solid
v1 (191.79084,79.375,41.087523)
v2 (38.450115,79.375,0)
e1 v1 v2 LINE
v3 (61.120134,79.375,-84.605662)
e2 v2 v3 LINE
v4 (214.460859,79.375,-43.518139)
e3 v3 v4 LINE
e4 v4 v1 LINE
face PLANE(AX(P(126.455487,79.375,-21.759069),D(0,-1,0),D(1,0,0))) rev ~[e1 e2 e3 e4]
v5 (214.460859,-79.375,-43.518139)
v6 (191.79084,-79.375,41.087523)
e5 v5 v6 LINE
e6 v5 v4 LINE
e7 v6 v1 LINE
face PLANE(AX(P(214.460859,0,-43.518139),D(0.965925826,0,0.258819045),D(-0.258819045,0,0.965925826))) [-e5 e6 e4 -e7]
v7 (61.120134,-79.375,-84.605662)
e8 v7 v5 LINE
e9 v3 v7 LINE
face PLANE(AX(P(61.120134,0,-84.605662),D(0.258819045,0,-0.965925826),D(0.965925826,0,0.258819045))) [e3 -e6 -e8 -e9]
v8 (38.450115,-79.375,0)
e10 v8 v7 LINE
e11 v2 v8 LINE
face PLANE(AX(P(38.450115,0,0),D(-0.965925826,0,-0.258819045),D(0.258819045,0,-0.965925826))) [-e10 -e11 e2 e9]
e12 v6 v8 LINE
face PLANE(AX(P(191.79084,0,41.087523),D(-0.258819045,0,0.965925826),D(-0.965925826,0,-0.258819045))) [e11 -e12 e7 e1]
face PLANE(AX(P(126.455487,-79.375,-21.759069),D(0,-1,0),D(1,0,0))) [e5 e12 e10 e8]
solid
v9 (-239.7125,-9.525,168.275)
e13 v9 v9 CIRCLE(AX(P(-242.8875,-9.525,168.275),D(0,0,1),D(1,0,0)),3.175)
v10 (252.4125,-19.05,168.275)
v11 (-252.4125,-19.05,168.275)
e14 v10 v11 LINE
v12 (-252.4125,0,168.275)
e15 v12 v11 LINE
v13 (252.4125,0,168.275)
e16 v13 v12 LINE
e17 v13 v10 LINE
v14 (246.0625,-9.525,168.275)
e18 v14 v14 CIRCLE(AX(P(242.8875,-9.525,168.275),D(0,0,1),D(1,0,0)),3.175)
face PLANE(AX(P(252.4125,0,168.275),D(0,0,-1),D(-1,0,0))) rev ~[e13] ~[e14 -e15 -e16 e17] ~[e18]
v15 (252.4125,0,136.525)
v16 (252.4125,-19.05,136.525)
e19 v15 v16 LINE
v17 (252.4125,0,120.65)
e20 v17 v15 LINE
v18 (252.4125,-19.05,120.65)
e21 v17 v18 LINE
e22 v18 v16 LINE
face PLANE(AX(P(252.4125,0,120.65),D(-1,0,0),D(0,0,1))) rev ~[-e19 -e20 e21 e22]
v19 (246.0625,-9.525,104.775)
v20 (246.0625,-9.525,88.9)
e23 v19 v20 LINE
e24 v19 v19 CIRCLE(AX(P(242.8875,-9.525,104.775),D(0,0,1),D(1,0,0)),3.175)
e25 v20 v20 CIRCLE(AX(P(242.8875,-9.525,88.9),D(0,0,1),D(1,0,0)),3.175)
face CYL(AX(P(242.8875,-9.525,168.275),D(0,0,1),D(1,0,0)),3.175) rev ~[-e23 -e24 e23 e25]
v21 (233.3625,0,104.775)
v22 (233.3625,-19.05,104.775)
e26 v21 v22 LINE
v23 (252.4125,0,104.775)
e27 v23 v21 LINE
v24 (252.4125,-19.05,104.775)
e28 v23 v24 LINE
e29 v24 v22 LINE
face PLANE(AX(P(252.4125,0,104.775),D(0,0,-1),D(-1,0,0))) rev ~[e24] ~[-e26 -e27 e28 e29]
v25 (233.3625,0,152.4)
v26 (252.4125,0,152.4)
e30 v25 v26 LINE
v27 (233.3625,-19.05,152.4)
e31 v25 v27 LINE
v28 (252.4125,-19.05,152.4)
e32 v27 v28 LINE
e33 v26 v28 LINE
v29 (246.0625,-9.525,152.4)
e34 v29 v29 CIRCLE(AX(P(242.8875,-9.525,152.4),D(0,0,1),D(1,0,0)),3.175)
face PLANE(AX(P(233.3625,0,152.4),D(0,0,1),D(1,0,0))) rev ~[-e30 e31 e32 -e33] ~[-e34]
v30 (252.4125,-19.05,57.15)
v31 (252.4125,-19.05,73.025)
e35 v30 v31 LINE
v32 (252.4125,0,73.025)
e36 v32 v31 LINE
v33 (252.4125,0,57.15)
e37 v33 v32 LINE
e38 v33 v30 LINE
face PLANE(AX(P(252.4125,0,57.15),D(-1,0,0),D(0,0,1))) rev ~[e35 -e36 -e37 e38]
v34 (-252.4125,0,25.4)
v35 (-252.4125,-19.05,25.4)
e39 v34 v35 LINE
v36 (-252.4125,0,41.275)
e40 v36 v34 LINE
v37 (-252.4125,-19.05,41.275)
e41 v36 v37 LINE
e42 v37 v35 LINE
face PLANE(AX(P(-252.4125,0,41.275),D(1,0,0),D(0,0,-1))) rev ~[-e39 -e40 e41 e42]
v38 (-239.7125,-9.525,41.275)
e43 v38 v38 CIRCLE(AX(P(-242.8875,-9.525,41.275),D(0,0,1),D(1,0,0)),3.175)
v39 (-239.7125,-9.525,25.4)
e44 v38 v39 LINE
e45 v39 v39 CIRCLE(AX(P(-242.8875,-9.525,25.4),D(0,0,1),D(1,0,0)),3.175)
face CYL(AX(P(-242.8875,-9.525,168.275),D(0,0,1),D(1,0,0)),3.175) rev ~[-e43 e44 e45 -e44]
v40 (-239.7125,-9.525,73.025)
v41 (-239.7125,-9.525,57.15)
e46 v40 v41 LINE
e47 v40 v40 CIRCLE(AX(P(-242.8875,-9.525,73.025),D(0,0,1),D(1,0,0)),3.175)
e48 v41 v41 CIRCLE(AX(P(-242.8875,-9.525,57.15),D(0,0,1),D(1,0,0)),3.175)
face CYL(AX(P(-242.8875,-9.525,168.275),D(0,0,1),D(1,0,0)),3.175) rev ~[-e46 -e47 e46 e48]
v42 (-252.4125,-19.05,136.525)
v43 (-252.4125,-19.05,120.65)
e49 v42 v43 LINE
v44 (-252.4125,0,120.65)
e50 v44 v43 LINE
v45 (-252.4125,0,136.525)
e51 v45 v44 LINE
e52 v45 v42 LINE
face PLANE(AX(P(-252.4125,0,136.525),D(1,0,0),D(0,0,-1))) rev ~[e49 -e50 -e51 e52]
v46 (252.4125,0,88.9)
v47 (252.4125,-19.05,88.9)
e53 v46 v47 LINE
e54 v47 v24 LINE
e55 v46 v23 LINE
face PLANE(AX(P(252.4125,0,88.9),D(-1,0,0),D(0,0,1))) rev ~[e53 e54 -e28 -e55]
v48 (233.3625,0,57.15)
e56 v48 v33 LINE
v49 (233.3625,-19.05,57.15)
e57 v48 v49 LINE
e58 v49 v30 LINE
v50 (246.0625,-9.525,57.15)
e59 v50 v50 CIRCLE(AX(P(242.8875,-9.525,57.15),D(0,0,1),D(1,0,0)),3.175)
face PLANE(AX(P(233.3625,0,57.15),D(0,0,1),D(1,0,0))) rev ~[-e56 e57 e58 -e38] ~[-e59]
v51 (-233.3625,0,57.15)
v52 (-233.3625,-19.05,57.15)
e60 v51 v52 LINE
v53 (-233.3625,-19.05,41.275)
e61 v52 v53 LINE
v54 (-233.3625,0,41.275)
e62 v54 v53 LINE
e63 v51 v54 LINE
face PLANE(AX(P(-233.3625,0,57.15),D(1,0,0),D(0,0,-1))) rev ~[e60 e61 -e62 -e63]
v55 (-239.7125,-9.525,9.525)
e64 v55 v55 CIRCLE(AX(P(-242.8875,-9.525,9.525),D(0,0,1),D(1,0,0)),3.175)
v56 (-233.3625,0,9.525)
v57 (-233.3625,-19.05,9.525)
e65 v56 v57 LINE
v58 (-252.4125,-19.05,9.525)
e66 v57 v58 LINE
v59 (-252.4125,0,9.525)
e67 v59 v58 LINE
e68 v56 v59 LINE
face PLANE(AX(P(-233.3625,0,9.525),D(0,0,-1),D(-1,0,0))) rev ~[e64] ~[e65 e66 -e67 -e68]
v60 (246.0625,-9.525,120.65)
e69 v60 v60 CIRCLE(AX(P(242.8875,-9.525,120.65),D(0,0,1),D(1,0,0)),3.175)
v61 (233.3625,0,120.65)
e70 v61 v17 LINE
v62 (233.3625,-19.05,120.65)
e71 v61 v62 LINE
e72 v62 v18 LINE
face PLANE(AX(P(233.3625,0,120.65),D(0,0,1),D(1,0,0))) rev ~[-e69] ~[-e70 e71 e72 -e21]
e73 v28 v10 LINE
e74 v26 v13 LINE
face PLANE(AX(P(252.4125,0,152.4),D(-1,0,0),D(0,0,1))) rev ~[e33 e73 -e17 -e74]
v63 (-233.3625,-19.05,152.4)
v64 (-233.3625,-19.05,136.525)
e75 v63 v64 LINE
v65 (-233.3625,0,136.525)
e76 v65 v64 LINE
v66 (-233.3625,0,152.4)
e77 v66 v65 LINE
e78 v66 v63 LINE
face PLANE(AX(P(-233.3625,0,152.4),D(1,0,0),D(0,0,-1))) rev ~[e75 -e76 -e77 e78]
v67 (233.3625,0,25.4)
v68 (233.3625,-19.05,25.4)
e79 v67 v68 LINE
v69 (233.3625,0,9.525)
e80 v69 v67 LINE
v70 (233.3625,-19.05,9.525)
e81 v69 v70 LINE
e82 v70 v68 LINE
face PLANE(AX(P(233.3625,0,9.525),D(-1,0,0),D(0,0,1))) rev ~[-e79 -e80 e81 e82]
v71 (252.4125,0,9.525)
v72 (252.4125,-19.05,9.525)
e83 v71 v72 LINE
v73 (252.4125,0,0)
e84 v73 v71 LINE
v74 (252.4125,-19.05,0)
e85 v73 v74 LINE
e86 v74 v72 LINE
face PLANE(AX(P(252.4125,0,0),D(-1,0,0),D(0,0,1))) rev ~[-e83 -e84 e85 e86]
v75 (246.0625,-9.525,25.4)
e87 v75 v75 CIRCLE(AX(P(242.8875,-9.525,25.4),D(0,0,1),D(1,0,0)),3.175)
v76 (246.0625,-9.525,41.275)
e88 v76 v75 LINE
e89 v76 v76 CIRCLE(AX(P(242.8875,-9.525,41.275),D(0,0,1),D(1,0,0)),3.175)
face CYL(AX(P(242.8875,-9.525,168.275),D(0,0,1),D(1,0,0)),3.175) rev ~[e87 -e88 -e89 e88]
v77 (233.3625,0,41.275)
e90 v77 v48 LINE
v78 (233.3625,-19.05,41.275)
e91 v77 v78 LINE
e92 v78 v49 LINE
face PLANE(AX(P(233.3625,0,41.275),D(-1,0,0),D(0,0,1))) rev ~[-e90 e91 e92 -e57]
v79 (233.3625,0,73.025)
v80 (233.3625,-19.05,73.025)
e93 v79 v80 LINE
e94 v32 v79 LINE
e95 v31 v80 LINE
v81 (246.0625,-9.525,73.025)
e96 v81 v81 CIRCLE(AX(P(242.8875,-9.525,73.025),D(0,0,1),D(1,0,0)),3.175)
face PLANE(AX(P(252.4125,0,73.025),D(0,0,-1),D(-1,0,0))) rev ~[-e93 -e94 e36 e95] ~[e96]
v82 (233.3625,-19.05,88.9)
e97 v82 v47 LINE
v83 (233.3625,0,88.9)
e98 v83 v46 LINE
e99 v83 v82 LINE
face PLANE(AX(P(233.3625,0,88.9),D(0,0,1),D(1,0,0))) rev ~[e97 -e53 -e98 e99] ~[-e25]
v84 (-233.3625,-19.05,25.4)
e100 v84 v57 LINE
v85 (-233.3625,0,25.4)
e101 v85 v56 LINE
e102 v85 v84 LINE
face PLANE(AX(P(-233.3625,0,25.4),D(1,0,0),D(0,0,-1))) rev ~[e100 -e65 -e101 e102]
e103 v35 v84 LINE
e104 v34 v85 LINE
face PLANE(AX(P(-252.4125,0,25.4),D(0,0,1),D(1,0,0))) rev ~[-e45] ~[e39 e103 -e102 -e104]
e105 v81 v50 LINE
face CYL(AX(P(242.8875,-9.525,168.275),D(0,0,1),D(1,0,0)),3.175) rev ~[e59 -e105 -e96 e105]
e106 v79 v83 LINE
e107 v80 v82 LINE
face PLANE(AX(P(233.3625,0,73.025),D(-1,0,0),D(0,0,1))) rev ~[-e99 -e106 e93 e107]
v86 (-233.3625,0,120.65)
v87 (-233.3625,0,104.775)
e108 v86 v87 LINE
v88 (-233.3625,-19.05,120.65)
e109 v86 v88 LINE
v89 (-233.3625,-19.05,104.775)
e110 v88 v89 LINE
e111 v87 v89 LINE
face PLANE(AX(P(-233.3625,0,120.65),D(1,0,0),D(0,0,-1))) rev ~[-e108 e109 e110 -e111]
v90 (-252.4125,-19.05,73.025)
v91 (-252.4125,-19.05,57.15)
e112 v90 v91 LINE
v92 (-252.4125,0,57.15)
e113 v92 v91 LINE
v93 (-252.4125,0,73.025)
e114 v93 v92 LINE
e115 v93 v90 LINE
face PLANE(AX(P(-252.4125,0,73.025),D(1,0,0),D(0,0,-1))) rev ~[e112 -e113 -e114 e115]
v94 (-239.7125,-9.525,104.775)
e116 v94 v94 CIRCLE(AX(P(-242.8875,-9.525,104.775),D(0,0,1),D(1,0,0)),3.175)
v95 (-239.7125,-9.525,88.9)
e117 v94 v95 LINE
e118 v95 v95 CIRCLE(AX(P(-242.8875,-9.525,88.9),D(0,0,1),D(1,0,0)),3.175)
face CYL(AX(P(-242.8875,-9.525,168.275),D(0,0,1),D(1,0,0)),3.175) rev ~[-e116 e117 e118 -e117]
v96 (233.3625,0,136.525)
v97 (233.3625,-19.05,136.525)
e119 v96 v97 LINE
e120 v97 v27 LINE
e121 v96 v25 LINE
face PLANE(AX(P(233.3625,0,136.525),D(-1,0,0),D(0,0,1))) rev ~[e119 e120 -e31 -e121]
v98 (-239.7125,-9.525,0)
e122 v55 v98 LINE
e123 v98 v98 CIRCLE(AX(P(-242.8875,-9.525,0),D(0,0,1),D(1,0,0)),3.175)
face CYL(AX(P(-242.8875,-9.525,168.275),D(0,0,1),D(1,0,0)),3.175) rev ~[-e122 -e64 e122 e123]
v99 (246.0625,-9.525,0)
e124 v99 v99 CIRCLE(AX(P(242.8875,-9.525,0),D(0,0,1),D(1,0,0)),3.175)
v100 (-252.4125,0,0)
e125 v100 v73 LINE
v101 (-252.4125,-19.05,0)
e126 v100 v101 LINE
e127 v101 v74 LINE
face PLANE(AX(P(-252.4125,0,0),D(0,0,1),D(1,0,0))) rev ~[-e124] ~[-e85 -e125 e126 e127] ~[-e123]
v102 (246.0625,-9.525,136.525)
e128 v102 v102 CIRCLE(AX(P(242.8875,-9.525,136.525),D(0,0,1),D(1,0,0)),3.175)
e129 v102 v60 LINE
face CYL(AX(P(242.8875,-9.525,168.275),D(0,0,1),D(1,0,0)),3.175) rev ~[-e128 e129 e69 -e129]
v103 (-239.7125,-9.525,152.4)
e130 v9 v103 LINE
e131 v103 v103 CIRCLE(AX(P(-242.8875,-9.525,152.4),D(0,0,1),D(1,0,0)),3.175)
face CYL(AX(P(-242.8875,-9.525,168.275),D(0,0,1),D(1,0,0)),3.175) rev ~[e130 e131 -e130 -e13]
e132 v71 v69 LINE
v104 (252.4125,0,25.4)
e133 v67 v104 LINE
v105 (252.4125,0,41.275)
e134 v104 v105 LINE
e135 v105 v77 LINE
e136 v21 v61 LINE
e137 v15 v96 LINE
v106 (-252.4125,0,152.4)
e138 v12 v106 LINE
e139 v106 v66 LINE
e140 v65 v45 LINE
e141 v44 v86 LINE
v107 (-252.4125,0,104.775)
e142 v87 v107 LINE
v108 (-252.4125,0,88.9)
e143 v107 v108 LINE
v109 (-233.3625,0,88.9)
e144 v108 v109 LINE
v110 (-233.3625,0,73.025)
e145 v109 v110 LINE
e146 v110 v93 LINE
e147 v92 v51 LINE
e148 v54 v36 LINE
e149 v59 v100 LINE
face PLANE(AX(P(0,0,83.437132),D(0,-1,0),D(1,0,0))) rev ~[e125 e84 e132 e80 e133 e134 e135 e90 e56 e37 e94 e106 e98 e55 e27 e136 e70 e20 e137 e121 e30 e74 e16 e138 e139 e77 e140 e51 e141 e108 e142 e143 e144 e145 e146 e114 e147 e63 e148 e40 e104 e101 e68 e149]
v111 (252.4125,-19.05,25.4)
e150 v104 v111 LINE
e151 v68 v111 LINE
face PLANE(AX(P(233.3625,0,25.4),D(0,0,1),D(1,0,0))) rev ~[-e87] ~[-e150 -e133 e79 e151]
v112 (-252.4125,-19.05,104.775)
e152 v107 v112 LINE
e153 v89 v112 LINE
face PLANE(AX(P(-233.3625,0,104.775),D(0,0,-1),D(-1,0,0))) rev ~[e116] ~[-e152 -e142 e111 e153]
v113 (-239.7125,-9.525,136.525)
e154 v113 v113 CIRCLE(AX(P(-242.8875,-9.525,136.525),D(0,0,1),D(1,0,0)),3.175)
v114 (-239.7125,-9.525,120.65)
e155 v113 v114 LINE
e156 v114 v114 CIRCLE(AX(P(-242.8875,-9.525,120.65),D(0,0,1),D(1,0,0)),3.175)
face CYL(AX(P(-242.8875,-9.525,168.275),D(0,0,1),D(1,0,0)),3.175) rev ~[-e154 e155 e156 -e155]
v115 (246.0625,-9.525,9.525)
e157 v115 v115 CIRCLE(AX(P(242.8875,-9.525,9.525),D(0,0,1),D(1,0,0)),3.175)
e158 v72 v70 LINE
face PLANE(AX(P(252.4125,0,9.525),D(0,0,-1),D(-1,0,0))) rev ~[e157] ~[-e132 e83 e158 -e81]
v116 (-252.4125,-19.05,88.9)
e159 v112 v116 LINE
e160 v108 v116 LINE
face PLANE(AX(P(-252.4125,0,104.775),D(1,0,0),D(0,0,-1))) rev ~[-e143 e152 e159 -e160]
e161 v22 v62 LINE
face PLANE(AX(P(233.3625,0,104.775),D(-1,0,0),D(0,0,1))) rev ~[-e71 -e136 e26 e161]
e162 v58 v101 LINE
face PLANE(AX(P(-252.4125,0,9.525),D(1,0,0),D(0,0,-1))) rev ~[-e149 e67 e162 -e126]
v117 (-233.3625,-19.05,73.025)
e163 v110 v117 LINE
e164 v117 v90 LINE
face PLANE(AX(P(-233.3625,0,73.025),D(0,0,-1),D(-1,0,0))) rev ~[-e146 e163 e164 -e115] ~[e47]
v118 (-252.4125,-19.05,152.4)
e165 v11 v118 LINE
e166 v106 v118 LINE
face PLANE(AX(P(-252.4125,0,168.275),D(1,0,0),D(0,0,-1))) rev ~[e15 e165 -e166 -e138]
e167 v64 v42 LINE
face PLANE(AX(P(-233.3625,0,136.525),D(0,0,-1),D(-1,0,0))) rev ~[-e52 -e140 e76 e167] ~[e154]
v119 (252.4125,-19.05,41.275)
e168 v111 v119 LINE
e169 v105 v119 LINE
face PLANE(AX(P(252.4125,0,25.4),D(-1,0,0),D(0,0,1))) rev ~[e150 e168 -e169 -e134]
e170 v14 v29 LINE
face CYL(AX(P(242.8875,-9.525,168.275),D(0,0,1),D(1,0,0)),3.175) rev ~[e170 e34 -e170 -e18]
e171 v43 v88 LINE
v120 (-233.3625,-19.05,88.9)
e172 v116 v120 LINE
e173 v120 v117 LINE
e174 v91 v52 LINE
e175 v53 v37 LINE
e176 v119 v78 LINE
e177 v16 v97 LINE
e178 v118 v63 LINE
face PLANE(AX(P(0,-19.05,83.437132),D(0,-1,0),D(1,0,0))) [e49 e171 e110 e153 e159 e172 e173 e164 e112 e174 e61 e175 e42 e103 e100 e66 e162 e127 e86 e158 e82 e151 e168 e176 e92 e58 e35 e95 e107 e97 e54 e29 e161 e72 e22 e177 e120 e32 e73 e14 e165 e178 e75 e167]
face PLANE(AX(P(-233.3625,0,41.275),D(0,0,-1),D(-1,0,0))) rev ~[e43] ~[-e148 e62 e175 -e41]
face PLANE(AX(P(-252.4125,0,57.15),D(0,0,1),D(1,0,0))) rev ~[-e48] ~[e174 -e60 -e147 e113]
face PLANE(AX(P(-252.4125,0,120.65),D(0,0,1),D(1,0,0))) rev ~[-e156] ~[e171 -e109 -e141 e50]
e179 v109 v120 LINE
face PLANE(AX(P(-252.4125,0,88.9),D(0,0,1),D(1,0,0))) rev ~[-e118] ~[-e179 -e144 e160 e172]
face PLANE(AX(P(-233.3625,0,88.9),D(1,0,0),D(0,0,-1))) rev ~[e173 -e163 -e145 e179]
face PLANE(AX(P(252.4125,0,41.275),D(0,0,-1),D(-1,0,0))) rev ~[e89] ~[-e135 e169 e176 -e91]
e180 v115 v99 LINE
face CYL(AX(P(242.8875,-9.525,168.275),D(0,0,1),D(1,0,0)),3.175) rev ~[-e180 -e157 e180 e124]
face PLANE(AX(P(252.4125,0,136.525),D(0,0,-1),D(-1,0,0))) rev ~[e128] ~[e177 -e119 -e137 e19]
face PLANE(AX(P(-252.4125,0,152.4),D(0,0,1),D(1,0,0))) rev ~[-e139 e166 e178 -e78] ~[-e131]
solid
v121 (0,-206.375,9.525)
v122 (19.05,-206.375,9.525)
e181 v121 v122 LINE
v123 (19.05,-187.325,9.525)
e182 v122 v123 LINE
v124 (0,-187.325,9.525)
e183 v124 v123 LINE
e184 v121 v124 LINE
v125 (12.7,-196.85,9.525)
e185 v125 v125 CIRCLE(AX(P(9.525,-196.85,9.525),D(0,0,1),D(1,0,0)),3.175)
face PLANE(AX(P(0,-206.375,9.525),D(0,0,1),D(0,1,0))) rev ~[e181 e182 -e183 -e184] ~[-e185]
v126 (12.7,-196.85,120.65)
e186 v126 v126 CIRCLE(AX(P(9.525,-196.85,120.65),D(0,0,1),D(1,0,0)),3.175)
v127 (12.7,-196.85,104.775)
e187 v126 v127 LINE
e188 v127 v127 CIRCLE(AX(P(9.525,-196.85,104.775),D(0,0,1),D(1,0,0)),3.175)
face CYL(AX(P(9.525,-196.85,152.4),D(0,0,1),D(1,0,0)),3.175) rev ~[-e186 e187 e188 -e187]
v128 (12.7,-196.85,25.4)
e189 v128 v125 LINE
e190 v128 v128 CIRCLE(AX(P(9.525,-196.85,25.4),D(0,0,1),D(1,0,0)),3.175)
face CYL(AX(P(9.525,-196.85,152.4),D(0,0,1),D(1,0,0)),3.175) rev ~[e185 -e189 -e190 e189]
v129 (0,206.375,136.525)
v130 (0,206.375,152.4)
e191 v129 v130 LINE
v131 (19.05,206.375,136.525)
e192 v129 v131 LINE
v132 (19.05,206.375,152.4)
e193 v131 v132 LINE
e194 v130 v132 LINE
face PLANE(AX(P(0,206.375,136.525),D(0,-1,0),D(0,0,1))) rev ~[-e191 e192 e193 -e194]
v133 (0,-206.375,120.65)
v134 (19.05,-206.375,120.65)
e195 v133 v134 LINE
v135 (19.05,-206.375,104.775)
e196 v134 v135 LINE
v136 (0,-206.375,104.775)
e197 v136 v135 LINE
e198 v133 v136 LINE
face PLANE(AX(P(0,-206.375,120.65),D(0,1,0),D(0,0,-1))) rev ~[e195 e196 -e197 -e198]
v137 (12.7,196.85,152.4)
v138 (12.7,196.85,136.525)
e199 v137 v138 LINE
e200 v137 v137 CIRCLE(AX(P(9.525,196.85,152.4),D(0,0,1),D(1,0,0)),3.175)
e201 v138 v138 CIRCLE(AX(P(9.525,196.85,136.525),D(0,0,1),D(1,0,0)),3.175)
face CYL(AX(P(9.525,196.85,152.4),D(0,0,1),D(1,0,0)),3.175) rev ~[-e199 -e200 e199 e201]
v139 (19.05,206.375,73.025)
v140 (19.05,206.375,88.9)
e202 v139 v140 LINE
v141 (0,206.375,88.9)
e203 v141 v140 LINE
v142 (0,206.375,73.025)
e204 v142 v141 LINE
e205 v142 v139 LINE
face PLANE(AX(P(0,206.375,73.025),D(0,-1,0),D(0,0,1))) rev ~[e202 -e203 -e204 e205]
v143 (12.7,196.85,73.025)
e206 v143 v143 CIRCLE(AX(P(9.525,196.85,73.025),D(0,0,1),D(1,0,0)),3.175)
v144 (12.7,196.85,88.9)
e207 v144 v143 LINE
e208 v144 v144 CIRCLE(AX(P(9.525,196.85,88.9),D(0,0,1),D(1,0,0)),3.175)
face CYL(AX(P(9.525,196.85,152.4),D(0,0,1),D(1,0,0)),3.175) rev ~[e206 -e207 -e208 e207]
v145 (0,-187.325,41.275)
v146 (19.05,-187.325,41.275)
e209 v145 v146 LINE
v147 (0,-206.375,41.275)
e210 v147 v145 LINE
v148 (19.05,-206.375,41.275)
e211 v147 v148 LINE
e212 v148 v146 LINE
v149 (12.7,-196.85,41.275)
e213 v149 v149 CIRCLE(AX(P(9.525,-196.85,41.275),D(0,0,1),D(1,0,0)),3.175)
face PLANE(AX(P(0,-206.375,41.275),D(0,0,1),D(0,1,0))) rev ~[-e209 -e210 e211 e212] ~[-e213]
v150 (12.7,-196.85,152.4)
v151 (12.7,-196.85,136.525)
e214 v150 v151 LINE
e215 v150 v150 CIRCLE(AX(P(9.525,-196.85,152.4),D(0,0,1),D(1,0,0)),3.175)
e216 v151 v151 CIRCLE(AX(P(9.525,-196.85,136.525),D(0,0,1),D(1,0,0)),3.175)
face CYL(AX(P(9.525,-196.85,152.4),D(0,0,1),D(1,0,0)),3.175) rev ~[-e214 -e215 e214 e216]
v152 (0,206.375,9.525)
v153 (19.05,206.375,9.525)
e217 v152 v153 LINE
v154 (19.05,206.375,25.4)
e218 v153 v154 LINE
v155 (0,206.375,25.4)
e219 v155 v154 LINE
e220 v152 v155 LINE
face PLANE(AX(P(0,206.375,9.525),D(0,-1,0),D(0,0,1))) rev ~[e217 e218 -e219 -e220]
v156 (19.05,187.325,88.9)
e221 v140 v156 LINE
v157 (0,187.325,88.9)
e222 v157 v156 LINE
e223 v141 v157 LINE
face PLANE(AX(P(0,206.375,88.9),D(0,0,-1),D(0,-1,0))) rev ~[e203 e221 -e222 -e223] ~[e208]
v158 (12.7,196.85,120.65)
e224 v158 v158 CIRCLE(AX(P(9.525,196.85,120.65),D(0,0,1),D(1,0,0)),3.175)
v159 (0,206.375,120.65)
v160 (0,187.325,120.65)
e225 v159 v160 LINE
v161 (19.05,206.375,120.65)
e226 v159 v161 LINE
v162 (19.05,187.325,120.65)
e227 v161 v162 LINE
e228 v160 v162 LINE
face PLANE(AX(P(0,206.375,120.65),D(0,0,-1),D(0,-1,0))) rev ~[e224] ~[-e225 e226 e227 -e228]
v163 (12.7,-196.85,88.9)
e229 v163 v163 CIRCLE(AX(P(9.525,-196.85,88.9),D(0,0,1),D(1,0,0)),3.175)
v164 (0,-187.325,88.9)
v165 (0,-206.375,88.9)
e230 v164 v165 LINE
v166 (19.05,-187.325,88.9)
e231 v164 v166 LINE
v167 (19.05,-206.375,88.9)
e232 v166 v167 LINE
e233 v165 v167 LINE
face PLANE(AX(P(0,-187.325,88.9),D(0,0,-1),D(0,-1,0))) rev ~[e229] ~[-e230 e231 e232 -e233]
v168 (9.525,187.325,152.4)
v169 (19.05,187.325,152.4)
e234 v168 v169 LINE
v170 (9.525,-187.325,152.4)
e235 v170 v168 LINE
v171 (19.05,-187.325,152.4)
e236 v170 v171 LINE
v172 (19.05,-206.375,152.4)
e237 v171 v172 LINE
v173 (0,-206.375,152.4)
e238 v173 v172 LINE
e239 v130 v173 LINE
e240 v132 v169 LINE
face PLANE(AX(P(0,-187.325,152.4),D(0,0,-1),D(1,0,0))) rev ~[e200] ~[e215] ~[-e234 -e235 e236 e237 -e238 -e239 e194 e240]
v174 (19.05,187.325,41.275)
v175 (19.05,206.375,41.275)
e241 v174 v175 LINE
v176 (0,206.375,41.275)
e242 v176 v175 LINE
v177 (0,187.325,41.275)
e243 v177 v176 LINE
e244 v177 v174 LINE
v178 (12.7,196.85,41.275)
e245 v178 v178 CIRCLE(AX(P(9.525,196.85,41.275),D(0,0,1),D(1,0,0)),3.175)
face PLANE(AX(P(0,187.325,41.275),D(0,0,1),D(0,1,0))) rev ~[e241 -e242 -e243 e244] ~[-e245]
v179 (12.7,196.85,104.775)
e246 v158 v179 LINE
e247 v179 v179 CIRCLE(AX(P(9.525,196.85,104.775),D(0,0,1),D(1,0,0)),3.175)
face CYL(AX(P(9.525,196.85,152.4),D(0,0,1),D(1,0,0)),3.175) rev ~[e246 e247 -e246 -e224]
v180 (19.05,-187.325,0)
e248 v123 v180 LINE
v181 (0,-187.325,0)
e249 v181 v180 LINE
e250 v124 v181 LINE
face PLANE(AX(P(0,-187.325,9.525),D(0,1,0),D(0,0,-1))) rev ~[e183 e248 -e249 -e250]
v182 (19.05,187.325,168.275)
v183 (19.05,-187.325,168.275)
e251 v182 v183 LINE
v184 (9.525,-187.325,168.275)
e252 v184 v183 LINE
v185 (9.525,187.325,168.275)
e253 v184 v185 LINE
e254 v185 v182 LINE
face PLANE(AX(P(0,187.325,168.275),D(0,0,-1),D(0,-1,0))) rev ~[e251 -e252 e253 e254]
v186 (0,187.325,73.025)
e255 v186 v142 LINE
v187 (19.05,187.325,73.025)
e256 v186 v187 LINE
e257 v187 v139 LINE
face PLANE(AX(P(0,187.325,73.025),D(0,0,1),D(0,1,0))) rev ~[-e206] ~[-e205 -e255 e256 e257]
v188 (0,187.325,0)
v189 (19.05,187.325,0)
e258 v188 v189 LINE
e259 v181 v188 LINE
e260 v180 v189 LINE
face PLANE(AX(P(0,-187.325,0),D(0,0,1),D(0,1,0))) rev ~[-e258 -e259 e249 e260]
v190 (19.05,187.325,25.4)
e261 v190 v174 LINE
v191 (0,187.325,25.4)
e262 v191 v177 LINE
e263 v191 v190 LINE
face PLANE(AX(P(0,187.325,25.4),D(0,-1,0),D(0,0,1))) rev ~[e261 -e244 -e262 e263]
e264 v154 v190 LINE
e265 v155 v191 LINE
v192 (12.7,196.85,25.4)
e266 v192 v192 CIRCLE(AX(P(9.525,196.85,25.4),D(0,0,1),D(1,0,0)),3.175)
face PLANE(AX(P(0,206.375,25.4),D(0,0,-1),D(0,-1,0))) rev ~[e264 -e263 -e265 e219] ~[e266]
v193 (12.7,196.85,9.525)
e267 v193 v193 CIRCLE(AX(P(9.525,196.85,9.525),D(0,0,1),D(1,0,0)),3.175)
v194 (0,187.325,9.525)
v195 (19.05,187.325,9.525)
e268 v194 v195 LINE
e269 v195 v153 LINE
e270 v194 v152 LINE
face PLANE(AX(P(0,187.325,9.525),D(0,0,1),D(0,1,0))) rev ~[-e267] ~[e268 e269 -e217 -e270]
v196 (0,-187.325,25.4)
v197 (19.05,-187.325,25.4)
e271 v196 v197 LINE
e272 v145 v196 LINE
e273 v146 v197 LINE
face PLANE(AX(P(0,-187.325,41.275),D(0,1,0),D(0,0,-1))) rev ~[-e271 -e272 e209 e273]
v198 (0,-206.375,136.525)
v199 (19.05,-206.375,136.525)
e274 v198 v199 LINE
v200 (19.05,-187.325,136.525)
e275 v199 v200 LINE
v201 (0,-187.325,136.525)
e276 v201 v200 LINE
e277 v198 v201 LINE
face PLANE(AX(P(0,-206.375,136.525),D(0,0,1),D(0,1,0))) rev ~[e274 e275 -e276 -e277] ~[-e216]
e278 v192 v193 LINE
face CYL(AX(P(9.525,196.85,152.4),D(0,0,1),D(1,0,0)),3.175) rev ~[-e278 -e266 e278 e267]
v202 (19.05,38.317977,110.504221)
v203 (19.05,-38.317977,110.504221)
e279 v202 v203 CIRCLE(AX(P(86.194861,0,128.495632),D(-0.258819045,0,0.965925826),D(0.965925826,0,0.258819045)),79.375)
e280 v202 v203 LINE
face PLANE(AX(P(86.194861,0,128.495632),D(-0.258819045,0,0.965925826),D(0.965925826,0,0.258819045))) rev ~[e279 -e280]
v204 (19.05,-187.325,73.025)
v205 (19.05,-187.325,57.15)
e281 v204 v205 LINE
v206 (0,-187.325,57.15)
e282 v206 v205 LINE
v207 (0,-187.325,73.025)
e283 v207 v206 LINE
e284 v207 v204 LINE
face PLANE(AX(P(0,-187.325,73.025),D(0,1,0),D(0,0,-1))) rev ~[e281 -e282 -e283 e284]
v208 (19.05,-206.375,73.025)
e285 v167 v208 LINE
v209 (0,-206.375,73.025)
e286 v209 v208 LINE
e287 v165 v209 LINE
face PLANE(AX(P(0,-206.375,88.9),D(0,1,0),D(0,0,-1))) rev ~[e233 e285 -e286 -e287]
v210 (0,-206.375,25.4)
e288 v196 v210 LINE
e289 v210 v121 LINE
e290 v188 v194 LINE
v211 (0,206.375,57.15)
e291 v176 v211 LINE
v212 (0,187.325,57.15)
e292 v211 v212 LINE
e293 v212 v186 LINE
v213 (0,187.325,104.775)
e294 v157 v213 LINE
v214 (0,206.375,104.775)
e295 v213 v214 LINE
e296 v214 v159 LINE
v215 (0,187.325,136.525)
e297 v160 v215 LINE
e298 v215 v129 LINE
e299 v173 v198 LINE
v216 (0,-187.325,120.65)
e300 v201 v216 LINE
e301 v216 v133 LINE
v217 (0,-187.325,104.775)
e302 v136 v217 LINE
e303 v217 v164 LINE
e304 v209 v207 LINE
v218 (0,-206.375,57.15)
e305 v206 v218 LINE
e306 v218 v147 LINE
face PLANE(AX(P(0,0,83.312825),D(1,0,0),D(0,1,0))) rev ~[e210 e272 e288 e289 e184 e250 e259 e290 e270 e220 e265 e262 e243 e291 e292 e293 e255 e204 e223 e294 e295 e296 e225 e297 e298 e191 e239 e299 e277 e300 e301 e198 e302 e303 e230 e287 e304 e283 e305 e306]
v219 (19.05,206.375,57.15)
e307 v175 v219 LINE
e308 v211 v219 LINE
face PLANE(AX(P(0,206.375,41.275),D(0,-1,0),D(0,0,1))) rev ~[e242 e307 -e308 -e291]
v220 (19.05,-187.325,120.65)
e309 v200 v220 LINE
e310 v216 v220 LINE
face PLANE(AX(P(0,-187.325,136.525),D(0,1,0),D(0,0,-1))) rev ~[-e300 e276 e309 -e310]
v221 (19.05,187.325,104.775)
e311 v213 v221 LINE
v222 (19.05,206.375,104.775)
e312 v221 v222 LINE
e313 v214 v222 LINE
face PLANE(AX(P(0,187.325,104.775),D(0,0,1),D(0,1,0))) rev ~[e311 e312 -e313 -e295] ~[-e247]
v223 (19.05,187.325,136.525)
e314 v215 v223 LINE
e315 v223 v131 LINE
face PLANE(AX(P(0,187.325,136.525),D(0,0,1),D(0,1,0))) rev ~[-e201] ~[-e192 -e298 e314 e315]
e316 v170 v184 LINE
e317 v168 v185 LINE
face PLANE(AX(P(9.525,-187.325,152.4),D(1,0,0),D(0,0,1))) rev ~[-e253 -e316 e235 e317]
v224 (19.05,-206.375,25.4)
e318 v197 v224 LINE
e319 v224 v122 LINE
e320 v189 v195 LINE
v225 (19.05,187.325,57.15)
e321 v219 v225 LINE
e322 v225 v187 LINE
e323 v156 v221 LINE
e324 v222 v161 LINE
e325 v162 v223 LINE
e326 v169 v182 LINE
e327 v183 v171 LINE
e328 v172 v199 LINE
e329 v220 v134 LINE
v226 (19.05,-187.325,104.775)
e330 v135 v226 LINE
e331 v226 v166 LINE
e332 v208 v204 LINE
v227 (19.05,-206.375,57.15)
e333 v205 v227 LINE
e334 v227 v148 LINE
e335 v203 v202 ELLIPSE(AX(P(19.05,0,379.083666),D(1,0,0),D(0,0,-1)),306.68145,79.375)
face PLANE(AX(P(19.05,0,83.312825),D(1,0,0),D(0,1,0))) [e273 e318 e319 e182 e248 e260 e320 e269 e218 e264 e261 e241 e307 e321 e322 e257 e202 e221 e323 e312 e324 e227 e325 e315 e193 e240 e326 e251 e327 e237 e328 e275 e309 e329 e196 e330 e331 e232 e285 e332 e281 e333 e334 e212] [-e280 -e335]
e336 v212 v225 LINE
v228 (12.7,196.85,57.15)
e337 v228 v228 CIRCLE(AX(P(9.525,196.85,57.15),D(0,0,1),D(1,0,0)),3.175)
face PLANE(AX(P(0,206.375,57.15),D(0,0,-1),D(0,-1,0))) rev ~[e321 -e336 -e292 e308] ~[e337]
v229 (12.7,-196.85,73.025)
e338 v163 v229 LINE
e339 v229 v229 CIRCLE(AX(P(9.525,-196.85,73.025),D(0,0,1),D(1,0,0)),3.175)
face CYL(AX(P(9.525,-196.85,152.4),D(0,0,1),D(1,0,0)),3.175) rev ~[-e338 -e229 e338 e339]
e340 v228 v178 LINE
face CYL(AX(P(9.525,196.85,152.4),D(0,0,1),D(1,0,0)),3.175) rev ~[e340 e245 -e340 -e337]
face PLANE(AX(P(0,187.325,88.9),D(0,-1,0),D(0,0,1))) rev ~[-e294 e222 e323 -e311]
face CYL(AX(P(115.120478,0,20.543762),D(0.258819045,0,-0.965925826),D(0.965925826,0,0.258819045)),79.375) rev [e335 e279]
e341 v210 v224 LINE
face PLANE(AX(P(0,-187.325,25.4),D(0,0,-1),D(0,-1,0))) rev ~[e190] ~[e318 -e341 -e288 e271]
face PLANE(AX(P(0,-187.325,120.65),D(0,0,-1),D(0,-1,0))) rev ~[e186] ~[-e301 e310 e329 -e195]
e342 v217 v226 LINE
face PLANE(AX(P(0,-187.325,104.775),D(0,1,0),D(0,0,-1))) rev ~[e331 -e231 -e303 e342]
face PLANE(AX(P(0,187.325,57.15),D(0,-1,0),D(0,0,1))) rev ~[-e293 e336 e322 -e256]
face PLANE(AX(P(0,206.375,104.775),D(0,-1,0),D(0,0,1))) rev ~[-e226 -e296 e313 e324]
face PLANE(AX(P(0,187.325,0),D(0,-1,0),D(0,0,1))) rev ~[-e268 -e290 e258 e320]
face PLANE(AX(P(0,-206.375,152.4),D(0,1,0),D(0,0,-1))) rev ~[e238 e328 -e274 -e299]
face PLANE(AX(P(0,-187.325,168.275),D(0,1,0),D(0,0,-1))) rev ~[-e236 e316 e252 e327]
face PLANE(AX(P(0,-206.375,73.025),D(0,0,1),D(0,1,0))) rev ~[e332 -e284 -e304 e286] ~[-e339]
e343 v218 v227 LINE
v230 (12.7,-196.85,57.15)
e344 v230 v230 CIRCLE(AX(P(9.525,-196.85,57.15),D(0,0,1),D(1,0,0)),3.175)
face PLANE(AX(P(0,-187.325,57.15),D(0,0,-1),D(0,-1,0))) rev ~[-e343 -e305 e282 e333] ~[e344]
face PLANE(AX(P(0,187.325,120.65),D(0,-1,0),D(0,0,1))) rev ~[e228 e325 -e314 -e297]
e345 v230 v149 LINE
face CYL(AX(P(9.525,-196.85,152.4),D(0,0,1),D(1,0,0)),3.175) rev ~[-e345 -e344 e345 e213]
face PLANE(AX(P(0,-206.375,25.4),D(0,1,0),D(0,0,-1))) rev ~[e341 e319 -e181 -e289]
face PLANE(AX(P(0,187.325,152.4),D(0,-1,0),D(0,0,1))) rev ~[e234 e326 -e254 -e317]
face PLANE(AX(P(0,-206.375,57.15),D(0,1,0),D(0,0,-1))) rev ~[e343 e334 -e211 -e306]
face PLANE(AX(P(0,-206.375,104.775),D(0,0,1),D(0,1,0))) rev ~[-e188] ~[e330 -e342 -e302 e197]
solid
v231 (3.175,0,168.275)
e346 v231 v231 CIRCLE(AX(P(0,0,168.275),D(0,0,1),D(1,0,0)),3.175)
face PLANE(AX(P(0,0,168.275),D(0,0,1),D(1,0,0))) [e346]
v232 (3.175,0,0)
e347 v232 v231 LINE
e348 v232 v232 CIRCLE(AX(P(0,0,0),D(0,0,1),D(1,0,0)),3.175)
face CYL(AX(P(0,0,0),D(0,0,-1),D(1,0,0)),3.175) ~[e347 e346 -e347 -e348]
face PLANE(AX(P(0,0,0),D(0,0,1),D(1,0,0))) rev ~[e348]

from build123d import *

# Parameters (mm, degrees)
F1_DEPTH  = 19.05
F3_DEPTH  = 19.05
F4_W      = 9.525
F4_H      = 15.875
F5_DEPTH  = 381
F6_R      = 3.175
F7_DEPTH  = 152.4
F8_R      = 3.175
F9_DEPTH  = 177.8
F10_R     = 3.175
F11_DEPTH = 168.275
F13_DEPTH = 79.375
F15_DEPTH = 111.76


with BuildPart() as f1:
    # F0 (on Front) → F1 (new body)
    with BuildSketch(Plane.XZ):
        Polygon((252.4125, 168.275), (0, 168.275), (-252.4125, 168.275), (-252.4125, 152.4), (-233.3625, 152.4), (-233.3625, 136.525), (-252.4125, 136.525), (-252.4125, 120.65), (-233.3625, 120.65), (-233.3625, 104.775), (-252.4125, 104.775), (-252.4125, 88.9), (-233.3625, 88.9), (-233.3625, 73.025), (-252.4125, 73.025), (-252.4125, 57.15), (-233.3625, 57.15), (-233.3625, 41.275), (-252.4125, 41.275), (-252.4125, 25.4), (-233.3625, 25.4), (-233.3625, 9.525), (-252.4125, 9.525), (-252.4125, 0), (0, 0), (252.4125, 0), (252.4125, 9.525), (233.3625, 9.525), (233.3625, 25.4), (252.4125, 25.4), (252.4125, 41.275), (233.3625, 41.275), (233.3625, 57.15), (252.4125, 57.15), (252.4125, 73.025), (233.3625, 73.025), (233.3625, 88.9), (252.4125, 88.9), (252.4125, 104.775), (233.3625, 104.775), (233.3625, 120.65), (252.4125, 120.65), (252.4125, 136.525), (233.3625, 136.525), (233.3625, 152.4), (252.4125, 152.4), align=None)
    extrude(amount=F1_DEPTH)

    # F8 (on face) → F9 (cut)
    with BuildSketch(Plane.XY.offset(168.275)):
        with Locations((-242.8875, -9.525)):
            Circle(F8_R)
        with Locations((242.8875, -9.525)):
            Circle(F8_R)
    extrude(amount=-F9_DEPTH, mode=Mode.SUBTRACT)


with BuildPart() as f3:
    # F2 (on Right) → F3 (new body)
    with BuildSketch(Plane.YZ):
        Polygon((187.325, 168.275), (0, 168.275), (-187.325, 168.275), (-187.325, 152.4), (-206.375, 152.4), (-206.375, 136.525), (-187.325, 136.525), (-187.325, 120.65), (-206.375, 120.65), (-206.375, 104.775), (-187.325, 104.775), (-187.325, 88.9), (-206.375, 88.9), (-206.375, 73.025), (-187.325, 73.025), (-187.325, 57.15), (-206.375, 57.15), (-206.375, 41.275), (-187.325, 41.275), (-187.325, 25.4), (-206.375, 25.4), (-206.375, 9.525), (-187.325, 9.525), (-187.325, 0), (0, 0), (187.325, 0), (187.325, 9.525), (206.375, 9.525), (206.375, 25.4), (187.325, 25.4), (187.325, 41.275), (206.375, 41.275), (206.375, 57.15), (187.325, 57.15), (187.325, 73.025), (206.375, 73.025), (206.375, 88.9), (187.325, 88.9), (187.325, 104.775), (206.375, 104.775), (206.375, 120.65), (187.325, 120.65), (187.325, 136.525), (206.375, 136.525), (206.375, 152.4), (187.325, 152.4), align=None)
    extrude(amount=F3_DEPTH)

    # F4 (on face) → F5 (cut)
    with BuildSketch(Plane.XZ.offset(187.325)):
        with Locations((4.7625, 160.3375)):
            Rectangle(F4_W, F4_H)
    extrude(amount=-F5_DEPTH, mode=Mode.SUBTRACT)

    # F6 (on face) → F7 (cut)
    with BuildSketch(Plane.XY.offset(152.4)):
        with Locations((9.525, 196.85)):
            Circle(F6_R)
        with Locations((9.525, -196.85)):
            Circle(F6_R)
    extrude(amount=-F7_DEPTH, mode=Mode.SUBTRACT)

    # F14 (on face) → F15 (cut)
    with BuildSketch(Plane(origin=(2.5756693374, 0, -9.6125288307), x_dir=(0.9659258263, 0, 0.2588190451), z_dir=(-0.2588190451, 0, 0.9659258263))):
        with BuildLine():
            ThreePointArc((116.5149594142, -79.375), (172.6415601709, -56.1266007567), (195.8899594142, 0))
            ThreePointArc((195.8899594142, 0), (172.6415601709, 56.1266007567), (116.5149594142, 79.375))
            ThreePointArc((116.5149594142, 79.375), (60.3883587272, 56.1266008263), (37.1399594142, 1.97e-07))
            ThreePointArc((37.1399594142, 1.97e-07), (60.3883585879, -56.126600687), (116.5149594142, -79.375))
        make_face()
    extrude(amount=F15_DEPTH, mode=Mode.SUBTRACT)


with BuildPart() as f11:
    # F10 (on Top) → F11 (new body)
    with BuildSketch(Plane.XY):
        Circle(F10_R)
    extrude(amount=F11_DEPTH)


with BuildPart() as f13:
    # F12 (on Front) → F13 (new body, symmetric)
    with BuildSketch(Plane.XZ):
        Polygon((191.7908402463, 41.08752341), (38.4501153229, 0), (61.120134133, -84.6056620075), (214.4608590563, -43.5181385975), align=None)
    extrude(amount=F13_DEPTH, both=True)


solid = Compound([f1.part, f3.part, f11.part, f13.part])
